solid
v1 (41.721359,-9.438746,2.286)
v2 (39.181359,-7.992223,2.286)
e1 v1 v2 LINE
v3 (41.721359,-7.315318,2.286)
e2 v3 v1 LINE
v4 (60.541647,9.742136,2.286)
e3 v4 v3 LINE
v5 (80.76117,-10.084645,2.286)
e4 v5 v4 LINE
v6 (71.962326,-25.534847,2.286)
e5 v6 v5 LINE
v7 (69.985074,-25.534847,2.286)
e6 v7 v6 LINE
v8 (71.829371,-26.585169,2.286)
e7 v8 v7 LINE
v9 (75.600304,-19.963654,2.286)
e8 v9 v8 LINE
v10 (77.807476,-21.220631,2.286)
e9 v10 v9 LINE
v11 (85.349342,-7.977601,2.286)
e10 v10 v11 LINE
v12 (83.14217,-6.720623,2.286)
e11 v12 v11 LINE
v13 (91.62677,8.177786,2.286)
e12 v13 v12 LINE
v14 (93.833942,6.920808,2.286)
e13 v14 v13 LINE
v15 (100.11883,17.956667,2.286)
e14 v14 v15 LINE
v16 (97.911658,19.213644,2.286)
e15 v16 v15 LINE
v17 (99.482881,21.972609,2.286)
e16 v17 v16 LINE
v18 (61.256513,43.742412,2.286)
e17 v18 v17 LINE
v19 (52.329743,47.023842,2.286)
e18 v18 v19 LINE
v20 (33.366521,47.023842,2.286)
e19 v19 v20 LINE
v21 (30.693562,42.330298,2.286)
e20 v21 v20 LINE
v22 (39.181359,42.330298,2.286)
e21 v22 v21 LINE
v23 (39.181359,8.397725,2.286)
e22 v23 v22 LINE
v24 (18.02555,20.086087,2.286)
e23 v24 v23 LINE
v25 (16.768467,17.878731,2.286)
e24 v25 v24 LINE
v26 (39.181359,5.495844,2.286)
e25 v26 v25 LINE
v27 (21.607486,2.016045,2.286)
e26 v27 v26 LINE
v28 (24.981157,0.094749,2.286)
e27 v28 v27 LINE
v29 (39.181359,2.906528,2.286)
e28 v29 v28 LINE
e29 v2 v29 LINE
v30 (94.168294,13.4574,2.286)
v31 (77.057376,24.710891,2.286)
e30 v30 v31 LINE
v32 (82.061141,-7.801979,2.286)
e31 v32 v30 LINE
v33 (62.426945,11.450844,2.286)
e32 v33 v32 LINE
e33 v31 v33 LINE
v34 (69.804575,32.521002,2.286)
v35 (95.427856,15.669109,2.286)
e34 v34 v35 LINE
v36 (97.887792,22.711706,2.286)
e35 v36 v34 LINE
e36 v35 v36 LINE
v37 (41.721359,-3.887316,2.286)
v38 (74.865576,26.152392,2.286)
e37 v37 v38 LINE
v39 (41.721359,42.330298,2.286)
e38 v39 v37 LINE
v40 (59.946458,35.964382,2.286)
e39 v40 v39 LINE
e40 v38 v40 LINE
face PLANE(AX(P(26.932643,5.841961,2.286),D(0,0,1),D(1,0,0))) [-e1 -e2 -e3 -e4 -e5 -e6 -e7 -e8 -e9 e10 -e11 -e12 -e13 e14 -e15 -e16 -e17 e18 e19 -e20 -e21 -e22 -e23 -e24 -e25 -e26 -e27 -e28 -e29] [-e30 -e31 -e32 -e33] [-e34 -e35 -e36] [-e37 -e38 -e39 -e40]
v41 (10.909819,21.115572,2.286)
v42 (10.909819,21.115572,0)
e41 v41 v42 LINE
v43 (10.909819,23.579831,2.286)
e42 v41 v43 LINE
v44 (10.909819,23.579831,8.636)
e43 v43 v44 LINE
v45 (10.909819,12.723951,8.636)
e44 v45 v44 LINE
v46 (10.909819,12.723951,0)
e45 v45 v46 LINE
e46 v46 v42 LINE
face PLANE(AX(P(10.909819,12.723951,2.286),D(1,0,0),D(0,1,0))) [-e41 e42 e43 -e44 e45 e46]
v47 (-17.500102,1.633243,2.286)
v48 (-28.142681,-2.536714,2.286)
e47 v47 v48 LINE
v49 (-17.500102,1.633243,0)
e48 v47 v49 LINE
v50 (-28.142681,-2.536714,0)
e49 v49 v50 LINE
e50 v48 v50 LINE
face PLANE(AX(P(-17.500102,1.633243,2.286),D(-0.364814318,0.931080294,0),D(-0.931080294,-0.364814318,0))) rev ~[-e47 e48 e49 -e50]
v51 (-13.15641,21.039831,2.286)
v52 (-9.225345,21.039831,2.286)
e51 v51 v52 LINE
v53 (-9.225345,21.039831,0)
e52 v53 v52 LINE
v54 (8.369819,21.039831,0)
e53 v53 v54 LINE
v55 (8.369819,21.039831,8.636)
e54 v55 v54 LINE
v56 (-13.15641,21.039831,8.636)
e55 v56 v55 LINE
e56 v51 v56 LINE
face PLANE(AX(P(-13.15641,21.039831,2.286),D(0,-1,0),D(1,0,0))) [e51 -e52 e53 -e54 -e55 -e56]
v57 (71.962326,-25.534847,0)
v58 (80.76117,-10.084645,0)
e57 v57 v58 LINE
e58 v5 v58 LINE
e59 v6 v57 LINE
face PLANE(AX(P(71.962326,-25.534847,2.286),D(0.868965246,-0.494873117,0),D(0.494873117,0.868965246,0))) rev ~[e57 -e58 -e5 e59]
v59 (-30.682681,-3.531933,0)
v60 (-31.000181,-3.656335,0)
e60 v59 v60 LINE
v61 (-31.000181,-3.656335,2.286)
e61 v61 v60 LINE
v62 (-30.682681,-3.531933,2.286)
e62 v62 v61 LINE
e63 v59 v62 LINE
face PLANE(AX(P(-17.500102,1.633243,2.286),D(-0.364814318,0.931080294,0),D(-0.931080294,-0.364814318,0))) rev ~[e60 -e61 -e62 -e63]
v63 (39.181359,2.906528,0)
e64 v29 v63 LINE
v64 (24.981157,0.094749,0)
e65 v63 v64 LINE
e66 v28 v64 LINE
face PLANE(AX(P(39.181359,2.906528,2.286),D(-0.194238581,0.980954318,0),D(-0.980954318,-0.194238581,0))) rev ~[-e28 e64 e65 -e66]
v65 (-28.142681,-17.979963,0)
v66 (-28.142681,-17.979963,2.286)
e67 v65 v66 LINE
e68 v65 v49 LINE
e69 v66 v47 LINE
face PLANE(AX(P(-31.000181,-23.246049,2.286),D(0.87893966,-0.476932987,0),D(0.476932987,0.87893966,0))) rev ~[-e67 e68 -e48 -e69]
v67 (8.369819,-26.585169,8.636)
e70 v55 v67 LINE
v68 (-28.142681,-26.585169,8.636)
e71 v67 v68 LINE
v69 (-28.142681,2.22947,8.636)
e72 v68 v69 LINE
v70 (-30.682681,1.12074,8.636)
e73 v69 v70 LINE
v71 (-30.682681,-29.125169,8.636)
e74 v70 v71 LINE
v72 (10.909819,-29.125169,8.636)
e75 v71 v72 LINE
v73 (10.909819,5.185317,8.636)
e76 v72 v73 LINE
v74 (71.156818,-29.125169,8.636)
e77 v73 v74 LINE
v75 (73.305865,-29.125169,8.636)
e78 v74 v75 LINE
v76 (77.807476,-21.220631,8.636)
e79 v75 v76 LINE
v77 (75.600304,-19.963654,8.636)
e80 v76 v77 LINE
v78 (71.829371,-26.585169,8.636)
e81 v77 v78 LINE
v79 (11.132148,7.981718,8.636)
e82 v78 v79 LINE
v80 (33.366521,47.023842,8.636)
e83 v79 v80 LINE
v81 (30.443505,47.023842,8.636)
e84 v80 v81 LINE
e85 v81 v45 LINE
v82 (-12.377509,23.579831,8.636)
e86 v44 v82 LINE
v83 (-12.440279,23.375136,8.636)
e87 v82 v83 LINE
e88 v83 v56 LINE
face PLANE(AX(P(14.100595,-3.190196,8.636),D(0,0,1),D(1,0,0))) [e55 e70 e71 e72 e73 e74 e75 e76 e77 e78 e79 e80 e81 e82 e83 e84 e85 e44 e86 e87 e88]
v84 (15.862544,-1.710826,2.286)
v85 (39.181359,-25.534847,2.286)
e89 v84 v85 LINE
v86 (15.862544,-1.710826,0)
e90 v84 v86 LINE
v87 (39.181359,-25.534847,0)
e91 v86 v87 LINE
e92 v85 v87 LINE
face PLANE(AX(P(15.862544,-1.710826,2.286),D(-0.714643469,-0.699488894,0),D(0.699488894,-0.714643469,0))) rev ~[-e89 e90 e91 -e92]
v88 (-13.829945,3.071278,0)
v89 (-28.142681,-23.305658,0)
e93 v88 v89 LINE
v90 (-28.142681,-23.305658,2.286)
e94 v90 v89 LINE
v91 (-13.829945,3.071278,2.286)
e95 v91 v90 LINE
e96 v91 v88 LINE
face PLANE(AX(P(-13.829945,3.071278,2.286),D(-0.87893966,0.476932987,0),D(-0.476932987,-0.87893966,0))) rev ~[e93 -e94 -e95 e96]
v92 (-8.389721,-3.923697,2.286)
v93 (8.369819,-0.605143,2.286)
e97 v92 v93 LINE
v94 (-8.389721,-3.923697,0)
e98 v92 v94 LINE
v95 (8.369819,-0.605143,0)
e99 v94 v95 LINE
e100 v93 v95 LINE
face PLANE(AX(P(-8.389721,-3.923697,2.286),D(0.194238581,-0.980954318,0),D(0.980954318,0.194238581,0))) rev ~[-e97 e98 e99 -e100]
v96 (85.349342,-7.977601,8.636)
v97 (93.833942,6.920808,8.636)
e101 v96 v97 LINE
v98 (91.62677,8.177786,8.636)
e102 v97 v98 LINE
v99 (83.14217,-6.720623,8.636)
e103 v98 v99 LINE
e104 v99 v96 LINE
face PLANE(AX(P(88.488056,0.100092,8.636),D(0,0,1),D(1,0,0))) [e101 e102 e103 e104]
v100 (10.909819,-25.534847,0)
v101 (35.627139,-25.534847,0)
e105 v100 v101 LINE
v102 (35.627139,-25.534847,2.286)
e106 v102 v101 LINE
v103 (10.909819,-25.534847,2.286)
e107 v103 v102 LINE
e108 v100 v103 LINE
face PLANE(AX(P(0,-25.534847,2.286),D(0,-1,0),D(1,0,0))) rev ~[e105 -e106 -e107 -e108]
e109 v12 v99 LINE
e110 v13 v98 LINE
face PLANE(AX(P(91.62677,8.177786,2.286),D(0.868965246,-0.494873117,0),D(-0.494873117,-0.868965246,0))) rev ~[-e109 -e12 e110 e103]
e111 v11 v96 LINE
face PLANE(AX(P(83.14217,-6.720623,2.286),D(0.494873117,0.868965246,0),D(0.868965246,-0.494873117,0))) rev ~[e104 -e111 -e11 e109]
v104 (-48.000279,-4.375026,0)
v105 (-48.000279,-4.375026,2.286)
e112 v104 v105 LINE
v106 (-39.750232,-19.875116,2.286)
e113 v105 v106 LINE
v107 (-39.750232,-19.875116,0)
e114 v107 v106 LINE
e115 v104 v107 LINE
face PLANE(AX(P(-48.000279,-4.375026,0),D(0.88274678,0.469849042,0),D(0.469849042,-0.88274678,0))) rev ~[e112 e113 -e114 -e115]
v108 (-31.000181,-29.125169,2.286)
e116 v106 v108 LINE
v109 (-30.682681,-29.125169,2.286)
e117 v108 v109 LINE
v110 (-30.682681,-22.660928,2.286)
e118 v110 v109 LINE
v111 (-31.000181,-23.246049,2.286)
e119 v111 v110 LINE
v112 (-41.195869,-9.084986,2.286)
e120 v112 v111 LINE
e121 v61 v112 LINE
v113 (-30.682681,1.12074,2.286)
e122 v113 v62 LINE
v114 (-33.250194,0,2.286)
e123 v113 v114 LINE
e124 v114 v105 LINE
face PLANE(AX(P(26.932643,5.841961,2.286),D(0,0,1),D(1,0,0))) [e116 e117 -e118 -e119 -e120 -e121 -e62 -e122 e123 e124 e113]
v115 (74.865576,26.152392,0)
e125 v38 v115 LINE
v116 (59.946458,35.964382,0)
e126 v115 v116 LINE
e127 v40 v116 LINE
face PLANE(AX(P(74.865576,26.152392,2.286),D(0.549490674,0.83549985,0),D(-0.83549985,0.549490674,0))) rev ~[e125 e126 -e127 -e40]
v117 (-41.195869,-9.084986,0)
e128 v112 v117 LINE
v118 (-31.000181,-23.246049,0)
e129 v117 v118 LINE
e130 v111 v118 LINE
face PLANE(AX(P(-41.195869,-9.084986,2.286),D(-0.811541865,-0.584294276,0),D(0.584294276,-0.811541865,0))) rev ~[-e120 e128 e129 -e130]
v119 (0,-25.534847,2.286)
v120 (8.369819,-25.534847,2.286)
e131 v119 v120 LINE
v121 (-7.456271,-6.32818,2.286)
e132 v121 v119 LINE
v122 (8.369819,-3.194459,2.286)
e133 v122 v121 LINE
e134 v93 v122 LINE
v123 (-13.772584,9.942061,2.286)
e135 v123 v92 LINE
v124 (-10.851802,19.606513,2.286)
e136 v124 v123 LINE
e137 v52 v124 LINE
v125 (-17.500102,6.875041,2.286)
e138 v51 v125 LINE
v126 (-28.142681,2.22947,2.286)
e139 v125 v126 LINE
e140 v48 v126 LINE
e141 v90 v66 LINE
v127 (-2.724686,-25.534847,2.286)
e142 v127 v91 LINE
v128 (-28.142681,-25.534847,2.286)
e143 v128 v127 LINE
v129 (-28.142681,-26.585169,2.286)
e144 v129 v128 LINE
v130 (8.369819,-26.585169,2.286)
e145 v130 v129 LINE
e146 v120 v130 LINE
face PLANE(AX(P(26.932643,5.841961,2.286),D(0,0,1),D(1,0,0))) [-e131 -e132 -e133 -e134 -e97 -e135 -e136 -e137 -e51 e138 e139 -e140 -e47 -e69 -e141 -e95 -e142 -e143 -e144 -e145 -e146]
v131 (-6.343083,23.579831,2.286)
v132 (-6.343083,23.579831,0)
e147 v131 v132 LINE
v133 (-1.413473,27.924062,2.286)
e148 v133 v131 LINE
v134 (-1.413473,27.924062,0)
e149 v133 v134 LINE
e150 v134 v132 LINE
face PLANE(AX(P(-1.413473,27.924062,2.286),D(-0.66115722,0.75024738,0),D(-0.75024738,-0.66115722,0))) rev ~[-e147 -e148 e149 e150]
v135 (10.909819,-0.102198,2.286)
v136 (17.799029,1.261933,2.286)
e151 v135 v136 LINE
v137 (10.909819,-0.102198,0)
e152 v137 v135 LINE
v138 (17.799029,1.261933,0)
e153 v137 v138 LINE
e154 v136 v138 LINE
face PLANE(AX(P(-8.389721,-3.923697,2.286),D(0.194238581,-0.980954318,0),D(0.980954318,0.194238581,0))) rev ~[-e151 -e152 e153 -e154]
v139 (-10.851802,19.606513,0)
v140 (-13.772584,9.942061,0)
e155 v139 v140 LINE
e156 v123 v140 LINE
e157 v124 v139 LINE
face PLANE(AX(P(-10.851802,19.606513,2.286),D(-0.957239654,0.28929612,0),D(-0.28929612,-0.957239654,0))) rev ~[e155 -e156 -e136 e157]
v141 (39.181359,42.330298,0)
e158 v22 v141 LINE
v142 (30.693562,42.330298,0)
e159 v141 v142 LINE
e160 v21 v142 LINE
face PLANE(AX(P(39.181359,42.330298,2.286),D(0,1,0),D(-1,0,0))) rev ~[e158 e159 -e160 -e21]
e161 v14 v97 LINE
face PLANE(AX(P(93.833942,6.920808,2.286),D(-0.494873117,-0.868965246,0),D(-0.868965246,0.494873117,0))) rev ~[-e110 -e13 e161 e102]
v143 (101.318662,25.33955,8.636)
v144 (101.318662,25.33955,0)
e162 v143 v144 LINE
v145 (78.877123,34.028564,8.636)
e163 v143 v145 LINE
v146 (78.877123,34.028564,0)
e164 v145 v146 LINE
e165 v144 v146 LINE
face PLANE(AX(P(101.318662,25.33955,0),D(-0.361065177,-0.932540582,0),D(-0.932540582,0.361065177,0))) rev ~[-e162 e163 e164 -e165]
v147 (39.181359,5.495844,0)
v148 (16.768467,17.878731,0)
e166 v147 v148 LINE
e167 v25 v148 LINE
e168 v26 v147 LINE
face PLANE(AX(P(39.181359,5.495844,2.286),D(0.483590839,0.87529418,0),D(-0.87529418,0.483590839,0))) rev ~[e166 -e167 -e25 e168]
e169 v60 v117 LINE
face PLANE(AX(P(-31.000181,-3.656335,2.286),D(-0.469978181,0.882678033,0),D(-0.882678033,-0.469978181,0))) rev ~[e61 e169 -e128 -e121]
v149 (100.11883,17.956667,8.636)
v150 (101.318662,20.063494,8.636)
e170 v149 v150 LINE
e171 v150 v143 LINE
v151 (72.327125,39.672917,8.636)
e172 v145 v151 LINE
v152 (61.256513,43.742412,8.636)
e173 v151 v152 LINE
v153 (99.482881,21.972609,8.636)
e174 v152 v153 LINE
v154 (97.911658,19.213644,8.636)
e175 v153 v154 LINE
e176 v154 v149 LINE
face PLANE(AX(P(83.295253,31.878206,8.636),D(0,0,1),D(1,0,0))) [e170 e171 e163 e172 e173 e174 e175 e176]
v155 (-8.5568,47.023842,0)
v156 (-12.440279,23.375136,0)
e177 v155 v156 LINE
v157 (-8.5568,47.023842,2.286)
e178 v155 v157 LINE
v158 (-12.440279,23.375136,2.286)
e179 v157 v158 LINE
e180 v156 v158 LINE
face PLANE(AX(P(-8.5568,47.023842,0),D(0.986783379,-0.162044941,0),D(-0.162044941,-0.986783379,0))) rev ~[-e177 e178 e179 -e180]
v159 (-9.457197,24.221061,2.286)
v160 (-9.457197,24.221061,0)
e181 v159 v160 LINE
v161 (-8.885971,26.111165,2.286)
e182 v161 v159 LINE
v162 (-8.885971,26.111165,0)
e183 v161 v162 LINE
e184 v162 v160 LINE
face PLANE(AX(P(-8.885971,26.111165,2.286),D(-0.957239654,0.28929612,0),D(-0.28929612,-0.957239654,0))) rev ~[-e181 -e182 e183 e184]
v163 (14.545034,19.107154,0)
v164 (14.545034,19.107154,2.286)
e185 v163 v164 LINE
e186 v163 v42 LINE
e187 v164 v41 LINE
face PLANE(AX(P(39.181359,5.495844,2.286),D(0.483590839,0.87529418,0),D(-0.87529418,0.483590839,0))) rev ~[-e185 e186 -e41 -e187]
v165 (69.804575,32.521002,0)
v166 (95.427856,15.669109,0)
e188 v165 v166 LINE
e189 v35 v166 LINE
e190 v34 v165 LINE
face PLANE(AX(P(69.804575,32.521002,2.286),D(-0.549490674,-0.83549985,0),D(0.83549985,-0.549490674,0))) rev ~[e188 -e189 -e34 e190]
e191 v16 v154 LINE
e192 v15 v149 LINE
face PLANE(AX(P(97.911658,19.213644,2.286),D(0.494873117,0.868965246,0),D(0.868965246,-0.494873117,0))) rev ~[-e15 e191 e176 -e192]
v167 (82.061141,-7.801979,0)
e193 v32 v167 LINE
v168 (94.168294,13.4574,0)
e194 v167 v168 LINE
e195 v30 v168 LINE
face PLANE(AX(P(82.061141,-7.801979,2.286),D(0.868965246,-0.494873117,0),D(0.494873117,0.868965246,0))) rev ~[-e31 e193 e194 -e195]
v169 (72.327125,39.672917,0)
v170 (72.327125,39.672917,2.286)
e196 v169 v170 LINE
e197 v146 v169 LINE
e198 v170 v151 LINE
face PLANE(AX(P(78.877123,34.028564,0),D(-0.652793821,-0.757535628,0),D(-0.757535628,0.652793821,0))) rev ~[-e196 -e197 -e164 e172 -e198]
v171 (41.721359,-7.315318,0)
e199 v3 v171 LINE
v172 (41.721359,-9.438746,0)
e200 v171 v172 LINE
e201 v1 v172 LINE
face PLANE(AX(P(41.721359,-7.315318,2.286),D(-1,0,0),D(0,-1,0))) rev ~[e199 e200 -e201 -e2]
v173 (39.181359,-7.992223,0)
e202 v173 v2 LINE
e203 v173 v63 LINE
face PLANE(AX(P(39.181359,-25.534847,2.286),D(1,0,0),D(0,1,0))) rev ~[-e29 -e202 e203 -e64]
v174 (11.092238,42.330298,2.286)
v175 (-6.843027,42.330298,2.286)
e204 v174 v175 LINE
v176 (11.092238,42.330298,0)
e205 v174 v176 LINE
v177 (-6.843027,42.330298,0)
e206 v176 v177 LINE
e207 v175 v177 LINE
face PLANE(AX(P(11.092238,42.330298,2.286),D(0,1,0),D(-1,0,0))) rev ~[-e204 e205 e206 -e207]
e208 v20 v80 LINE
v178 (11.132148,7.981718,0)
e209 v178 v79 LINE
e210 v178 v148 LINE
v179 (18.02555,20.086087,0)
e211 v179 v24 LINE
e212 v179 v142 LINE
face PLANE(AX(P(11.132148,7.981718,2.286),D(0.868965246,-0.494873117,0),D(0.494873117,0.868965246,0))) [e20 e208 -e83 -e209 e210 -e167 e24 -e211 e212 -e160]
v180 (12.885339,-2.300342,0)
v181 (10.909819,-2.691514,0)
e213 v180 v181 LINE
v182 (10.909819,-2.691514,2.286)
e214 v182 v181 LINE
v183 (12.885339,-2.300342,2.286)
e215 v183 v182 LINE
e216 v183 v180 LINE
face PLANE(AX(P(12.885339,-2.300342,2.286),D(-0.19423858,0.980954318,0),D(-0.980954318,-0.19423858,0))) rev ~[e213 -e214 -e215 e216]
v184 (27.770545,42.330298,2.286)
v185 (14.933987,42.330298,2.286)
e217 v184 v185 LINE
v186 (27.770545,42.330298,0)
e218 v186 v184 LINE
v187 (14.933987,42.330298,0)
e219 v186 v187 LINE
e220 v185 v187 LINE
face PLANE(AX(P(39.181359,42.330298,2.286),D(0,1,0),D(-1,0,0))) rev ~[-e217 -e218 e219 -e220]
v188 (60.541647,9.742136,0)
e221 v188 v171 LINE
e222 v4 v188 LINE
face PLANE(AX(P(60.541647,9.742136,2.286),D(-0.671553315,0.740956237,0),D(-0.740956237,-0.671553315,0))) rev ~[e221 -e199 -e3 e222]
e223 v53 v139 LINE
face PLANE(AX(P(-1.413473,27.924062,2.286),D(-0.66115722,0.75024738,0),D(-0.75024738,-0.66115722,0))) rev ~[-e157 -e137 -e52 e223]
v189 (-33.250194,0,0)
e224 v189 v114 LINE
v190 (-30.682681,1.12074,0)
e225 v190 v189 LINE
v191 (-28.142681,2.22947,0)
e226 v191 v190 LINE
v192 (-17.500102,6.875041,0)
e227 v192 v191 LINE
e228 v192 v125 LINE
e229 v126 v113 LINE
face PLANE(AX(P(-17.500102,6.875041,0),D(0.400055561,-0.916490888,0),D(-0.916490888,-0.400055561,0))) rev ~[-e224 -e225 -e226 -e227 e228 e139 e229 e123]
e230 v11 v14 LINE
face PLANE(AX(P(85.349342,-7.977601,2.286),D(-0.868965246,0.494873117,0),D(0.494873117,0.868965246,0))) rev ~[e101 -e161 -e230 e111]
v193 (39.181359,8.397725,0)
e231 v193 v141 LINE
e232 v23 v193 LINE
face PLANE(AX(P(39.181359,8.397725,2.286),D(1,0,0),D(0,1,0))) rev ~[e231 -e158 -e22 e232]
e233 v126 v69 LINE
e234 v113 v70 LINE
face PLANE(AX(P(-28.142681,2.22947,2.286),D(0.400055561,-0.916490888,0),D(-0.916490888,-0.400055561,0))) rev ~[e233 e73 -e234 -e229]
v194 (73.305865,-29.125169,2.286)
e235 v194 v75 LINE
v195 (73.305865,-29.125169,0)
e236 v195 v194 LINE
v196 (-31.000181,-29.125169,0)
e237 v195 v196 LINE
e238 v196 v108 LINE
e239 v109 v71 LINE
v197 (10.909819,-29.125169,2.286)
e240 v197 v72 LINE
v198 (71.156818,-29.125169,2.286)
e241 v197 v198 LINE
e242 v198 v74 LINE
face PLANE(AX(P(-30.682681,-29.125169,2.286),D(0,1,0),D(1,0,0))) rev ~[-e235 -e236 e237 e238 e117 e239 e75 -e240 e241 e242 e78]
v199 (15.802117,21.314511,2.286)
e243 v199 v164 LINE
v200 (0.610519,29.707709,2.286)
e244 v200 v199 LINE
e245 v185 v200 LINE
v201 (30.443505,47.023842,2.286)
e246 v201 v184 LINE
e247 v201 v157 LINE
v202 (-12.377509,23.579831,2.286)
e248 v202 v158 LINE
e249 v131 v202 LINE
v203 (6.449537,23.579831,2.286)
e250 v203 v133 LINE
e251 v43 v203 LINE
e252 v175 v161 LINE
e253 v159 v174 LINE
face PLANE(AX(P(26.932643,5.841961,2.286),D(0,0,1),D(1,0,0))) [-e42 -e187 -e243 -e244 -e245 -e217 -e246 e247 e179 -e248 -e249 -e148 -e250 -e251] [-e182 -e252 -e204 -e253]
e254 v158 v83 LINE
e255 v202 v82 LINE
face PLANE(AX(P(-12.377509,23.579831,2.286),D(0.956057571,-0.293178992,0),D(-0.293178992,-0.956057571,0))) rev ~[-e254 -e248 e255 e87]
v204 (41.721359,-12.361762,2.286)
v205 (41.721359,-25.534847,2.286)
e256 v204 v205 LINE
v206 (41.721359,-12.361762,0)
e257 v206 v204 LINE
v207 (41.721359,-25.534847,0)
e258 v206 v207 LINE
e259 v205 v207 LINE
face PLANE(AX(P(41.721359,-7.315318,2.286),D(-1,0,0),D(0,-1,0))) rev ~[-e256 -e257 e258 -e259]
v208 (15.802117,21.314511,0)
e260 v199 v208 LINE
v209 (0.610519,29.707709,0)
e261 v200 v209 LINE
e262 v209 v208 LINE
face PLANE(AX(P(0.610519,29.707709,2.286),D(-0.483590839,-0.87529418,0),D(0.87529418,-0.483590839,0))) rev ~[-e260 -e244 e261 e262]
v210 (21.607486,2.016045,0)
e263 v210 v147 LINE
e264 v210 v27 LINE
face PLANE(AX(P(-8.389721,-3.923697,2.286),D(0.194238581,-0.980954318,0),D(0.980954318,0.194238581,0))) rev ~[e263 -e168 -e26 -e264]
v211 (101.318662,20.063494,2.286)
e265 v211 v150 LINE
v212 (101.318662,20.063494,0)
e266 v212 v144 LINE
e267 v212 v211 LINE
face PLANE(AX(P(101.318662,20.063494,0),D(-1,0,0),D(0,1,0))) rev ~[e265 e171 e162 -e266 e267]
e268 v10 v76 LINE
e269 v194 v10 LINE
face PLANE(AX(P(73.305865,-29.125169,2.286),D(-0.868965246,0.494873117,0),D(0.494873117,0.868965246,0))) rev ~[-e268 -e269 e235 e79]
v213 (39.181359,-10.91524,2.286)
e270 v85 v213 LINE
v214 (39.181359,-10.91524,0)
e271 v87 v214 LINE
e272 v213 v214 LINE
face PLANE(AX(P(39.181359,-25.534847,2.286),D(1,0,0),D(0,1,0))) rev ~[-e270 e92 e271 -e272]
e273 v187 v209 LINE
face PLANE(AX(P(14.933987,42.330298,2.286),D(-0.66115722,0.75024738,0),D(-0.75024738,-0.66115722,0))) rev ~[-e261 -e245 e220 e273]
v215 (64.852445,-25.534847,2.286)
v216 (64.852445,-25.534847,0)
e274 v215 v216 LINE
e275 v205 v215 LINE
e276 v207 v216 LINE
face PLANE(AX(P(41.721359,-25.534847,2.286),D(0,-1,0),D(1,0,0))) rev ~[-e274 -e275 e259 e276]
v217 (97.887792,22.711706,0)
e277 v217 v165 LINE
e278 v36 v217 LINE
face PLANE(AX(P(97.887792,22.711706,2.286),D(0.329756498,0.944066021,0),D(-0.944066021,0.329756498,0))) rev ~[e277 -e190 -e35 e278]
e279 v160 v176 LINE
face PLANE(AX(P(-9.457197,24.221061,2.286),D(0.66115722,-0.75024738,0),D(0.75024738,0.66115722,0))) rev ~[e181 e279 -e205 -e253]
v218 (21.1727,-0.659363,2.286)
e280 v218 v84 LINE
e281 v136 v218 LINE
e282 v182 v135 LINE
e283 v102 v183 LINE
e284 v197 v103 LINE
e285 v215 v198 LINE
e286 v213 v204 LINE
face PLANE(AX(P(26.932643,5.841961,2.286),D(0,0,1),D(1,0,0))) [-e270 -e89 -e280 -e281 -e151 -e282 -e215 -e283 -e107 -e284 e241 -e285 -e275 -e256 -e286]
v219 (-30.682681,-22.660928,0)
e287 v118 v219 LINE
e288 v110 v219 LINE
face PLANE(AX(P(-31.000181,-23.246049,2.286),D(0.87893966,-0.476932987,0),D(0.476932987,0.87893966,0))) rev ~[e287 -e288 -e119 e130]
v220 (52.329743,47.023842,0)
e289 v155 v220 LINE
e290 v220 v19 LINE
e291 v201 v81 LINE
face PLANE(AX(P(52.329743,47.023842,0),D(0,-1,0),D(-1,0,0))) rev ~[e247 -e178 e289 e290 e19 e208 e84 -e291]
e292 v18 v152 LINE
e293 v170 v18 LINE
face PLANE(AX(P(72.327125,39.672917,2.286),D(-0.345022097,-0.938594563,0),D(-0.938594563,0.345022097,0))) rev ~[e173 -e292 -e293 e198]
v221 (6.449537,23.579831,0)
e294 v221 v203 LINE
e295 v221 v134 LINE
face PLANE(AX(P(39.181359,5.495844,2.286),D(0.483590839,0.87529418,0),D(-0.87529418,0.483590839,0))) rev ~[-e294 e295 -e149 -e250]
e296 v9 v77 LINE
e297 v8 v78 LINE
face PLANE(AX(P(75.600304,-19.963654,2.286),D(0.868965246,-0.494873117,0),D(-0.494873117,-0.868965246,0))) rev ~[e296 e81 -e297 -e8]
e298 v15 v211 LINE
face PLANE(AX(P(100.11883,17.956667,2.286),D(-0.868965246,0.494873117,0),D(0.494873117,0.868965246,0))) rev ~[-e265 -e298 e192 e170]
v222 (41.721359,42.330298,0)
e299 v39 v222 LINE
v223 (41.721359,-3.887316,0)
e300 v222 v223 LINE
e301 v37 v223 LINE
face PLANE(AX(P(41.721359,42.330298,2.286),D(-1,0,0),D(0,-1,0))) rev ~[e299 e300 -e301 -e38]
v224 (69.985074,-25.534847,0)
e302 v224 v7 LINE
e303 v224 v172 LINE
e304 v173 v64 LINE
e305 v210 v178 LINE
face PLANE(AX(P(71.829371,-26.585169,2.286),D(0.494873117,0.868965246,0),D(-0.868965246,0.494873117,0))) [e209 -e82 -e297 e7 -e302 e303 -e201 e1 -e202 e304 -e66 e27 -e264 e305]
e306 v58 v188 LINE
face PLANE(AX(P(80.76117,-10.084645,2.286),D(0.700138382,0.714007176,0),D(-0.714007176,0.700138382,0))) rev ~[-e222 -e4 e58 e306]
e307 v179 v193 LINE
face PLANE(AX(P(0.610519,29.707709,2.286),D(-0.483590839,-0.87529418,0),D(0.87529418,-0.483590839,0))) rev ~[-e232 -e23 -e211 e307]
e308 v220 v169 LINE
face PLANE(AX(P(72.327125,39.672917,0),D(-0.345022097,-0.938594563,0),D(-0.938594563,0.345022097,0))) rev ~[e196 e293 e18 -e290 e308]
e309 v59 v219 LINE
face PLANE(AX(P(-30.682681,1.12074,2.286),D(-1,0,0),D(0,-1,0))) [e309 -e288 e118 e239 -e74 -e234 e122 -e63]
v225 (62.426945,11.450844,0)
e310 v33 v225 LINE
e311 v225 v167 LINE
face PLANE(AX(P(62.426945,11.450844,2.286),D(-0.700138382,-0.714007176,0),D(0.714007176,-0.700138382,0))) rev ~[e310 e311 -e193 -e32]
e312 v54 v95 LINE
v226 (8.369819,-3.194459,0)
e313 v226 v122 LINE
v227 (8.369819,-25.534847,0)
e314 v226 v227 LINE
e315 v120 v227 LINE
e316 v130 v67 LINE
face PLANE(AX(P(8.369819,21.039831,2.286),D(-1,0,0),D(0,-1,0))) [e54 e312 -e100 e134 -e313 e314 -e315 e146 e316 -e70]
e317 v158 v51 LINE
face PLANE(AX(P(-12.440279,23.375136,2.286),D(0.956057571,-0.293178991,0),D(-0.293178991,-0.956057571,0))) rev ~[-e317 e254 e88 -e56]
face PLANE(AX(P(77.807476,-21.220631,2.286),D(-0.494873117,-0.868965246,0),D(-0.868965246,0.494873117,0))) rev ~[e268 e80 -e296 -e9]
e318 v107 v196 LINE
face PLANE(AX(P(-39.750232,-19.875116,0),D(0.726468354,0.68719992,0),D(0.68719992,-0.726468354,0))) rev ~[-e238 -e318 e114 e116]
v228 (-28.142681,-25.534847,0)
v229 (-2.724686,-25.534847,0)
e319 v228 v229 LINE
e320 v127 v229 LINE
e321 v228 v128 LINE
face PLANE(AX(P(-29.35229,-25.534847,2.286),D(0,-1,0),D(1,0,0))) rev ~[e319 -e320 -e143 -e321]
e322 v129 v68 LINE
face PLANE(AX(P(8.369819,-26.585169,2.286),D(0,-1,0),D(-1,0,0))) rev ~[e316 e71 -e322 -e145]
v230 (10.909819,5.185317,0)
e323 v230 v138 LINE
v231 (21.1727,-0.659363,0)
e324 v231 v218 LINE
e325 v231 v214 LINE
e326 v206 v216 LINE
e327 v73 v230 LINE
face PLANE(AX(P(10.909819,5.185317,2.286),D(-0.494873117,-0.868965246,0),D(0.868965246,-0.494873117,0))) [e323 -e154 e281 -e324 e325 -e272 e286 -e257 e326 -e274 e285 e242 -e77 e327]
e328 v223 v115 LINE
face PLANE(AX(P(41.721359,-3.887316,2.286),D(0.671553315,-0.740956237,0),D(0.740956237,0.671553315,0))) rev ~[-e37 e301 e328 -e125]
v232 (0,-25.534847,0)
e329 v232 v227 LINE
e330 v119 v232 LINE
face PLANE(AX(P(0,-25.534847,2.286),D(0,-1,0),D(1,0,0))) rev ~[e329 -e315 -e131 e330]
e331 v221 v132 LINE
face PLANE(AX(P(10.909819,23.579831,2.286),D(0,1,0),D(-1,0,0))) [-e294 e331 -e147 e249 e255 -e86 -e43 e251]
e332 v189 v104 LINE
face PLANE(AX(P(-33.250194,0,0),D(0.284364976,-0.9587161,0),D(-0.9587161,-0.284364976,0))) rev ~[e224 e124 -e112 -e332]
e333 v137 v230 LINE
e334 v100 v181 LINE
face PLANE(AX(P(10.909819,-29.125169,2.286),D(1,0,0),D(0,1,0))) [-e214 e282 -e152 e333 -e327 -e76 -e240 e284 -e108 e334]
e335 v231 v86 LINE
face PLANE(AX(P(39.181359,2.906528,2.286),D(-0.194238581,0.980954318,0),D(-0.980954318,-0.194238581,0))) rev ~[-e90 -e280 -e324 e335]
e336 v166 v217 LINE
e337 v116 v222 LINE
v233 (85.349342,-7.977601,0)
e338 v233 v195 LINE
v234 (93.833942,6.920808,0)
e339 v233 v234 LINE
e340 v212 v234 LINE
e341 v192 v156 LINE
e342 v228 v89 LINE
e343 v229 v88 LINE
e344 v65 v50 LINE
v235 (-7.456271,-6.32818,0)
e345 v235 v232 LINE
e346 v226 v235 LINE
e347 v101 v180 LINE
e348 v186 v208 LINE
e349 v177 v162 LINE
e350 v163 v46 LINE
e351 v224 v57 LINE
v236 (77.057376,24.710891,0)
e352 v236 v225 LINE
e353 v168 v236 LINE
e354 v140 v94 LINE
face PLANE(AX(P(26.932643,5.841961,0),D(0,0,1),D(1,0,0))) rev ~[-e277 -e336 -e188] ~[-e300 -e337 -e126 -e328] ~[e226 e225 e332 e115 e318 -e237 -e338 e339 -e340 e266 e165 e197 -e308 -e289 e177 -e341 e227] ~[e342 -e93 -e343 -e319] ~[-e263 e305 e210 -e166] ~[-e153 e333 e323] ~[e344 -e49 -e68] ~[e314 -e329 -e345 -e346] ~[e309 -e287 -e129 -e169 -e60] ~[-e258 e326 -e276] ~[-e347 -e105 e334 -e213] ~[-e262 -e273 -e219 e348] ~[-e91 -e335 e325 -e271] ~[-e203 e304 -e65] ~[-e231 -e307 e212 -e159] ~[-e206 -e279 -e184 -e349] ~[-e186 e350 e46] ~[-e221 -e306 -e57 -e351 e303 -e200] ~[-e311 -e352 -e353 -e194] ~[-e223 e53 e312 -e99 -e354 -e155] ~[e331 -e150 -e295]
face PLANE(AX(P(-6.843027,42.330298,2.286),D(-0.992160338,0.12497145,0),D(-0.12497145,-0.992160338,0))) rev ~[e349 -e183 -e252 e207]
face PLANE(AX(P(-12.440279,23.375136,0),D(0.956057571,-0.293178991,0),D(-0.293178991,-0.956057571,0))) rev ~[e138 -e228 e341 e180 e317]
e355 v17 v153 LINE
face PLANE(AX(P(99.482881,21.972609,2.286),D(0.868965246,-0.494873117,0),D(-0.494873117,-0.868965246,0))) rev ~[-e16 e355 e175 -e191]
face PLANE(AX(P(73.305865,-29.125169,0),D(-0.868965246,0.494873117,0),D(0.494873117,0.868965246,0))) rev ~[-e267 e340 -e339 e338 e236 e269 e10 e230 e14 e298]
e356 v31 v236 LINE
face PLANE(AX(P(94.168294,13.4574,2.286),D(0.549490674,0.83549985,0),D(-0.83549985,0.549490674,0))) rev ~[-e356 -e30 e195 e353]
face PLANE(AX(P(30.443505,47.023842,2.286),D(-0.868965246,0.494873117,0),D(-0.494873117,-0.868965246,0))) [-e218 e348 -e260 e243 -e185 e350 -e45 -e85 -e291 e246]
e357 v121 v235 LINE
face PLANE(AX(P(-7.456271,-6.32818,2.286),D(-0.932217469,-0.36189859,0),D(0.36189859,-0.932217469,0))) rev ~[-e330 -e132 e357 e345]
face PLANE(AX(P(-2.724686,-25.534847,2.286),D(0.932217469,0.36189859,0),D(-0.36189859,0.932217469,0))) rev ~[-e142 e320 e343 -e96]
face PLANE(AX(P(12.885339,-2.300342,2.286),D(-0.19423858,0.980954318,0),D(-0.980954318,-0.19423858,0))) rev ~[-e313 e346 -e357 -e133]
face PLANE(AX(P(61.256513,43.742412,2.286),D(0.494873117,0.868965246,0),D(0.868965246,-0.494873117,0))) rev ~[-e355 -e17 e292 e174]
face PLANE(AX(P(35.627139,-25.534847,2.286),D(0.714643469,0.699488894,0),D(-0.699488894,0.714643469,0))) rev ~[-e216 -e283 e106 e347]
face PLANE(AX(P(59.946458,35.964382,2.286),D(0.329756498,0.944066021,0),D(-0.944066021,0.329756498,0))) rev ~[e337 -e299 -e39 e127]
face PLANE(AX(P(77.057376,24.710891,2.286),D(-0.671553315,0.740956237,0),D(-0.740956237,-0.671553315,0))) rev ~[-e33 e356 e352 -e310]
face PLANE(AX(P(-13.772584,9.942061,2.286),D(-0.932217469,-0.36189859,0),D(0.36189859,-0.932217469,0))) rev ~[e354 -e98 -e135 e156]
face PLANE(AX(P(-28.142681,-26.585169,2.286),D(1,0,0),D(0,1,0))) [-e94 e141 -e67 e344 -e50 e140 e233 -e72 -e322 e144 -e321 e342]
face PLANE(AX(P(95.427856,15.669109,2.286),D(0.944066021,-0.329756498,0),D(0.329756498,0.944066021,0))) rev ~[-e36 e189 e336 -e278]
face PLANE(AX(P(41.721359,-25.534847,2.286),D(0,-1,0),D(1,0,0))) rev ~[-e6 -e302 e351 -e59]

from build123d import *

# Parameters (mm, degrees)
F1_DEPTH      = 2.286
F4_DEPTH      = 2.287
F5_DEPTH      = 6.35
F5_DEPTH_BACK = 2.286


# Not quite as in the source:
# - a feature names something its author has since deleted; it is built from what else it names


with BuildPart() as f1:
    # F0 (on Top) → F1 (new body)
    with BuildSketch(Plane.XY):
        Polygon((-39.7502322496, -19.8751161248), (-31.0001806734, -29.1251689516), (73.3058652154, -29.1251689516), (101.3186621261, 20.063493978), (101.3186621261, 25.3395497125), (78.8771229202, 34.0285638846), (72.3271246897, 39.6729167182), (52.3297434038, 47.023841916), (50.4247434038, 47.023841916), (21.8864718038, 47.023841916), (19.9814718038, 47.023841916), (-8.5567997962, 47.023841916), (-12.4402794499, 23.3751358177), (-17.5001015898, 6.8750406358), (-33.2501941145, 0), (-48.0002794499, -4.3750257881), align=None)
    extrude(amount=F1_DEPTH)

    # F3 (on face) → F4 (cut, through all)
    with BuildSketch(Plane.XY.offset(2.286)):
        Polygon((-1.4134727199, 27.9240615151), (-10.8518015695, 19.606512621), (-13.772583649, 9.942060765), (-8.389721466, -3.9236969292), (39.1813585612, 5.4958437045), align=None)
        Polygon((39.1813585612, 42.3302979083), (14.9339871262, 42.3302979083), (0.6105190133, 29.707708861), (39.1813585612, 8.3977252198), align=None)
        Polygon((59.9464575784, 35.9643820735), (41.7213585612, 42.3302979083), (41.7213585612, -3.8873157464), (74.8655756118, 26.1523920247), align=None)
        Polygon((94.1682944652, 13.4573999427), (77.0573760218, 24.7108910081), (62.4269453342, 11.4508444138), (82.0611413863, -7.8019792523), align=None)
        Polygon((97.8877921519, 22.7117055132), (69.8045753566, 32.5210017107), (95.4278561797, 15.6691089989), align=None)
        Polygon((60.5416469817, 9.7421357277), (41.7213585612, -7.3153184719), (41.7213585612, -25.5348474687), (71.9623257974, -25.5348474687), (80.7611698183, -10.0846454022), align=None)
        Polygon((39.1813585612, -25.5348474687), (39.1813585612, 2.906528429), (15.8625438549, -1.7108256973), align=None)
        Polygon((12.8853386979, -2.3003415321), (-7.4562708514, -6.3281798236), (0, -25.5348474687), (35.6271387151, -25.5348474687), align=None)
        Polygon((-2.7246861202, -25.5348474687), (-13.8299450744, 3.0712777777), (-29.3522901989, -25.5348474687), align=None)
        Polygon((-31.0001806734, -23.2460485454), (-17.5001015898, 1.6332432115), (-31.0001806734, -3.6563351177), (-41.1958687779, -9.0849860736), align=None)
        Polygon((11.0922382598, 42.3302979083), (-6.8430267274, 42.3302979083), (-8.8859712705, 26.1111650616), (-9.4571967621, 24.2210612772), align=None)
    extrude(amount=-F4_DEPTH, mode=Mode.SUBTRACT)

    # F2 (on face) → F5 (join, two sides)
    with BuildSketch(Plane.XY.offset(2.286)) as f5_sk:
        Polygon((75.6003040089, -19.9636537803), (71.829370857, -26.5851689516), (11.132148453, 7.9817182735), (33.3665214857, 47.023841916), (30.4435046989, 47.023841916), (10.9098193266, 12.7239514546), (10.9098193266, 23.5798310484), (-12.3775088144, 23.5798310484), (-12.4402794499, 23.3751358177), (-13.1564102749, 21.0398310484), (8.3698193266, 21.0398310484), (8.3698193266, -26.5851689516), (-28.1426806734, -26.5851689516), (-28.1426806734, 2.2294702333), (-30.6826806734, 1.1207400345), (-30.6826806734, -29.1251689516), (-28.1426806734, -29.1251689516), (8.3698193266, -29.1251689516), (10.9098193266, -29.1251689516), (10.9098193266, 5.1853172614), (71.1568181061, -29.1251689516), (73.3058652154, -29.1251689516), (77.8074757327, -21.2206314976), align=None)
        Polygon((91.6267699042, 8.177785698), (83.1421703125, -6.7206234376), (85.3493420363, -7.9776011549), (93.8339416279, 6.9208079807), align=None)
        Polygon((99.4828806371, 21.9726089716), (97.9116584905, 19.2136443169), (100.1188302143, 17.9566665996), (101.3186621261, 20.063493978), (101.3186621261, 25.3395497125), (78.8771229202, 34.0285638846), (72.3271246897, 39.6729167182), (61.2565125507, 43.7424116468), align=None)
    extrude(amount=F5_DEPTH)
    extrude(f5_sk.sketch, amount=-F5_DEPTH_BACK)


solid = f1.part
